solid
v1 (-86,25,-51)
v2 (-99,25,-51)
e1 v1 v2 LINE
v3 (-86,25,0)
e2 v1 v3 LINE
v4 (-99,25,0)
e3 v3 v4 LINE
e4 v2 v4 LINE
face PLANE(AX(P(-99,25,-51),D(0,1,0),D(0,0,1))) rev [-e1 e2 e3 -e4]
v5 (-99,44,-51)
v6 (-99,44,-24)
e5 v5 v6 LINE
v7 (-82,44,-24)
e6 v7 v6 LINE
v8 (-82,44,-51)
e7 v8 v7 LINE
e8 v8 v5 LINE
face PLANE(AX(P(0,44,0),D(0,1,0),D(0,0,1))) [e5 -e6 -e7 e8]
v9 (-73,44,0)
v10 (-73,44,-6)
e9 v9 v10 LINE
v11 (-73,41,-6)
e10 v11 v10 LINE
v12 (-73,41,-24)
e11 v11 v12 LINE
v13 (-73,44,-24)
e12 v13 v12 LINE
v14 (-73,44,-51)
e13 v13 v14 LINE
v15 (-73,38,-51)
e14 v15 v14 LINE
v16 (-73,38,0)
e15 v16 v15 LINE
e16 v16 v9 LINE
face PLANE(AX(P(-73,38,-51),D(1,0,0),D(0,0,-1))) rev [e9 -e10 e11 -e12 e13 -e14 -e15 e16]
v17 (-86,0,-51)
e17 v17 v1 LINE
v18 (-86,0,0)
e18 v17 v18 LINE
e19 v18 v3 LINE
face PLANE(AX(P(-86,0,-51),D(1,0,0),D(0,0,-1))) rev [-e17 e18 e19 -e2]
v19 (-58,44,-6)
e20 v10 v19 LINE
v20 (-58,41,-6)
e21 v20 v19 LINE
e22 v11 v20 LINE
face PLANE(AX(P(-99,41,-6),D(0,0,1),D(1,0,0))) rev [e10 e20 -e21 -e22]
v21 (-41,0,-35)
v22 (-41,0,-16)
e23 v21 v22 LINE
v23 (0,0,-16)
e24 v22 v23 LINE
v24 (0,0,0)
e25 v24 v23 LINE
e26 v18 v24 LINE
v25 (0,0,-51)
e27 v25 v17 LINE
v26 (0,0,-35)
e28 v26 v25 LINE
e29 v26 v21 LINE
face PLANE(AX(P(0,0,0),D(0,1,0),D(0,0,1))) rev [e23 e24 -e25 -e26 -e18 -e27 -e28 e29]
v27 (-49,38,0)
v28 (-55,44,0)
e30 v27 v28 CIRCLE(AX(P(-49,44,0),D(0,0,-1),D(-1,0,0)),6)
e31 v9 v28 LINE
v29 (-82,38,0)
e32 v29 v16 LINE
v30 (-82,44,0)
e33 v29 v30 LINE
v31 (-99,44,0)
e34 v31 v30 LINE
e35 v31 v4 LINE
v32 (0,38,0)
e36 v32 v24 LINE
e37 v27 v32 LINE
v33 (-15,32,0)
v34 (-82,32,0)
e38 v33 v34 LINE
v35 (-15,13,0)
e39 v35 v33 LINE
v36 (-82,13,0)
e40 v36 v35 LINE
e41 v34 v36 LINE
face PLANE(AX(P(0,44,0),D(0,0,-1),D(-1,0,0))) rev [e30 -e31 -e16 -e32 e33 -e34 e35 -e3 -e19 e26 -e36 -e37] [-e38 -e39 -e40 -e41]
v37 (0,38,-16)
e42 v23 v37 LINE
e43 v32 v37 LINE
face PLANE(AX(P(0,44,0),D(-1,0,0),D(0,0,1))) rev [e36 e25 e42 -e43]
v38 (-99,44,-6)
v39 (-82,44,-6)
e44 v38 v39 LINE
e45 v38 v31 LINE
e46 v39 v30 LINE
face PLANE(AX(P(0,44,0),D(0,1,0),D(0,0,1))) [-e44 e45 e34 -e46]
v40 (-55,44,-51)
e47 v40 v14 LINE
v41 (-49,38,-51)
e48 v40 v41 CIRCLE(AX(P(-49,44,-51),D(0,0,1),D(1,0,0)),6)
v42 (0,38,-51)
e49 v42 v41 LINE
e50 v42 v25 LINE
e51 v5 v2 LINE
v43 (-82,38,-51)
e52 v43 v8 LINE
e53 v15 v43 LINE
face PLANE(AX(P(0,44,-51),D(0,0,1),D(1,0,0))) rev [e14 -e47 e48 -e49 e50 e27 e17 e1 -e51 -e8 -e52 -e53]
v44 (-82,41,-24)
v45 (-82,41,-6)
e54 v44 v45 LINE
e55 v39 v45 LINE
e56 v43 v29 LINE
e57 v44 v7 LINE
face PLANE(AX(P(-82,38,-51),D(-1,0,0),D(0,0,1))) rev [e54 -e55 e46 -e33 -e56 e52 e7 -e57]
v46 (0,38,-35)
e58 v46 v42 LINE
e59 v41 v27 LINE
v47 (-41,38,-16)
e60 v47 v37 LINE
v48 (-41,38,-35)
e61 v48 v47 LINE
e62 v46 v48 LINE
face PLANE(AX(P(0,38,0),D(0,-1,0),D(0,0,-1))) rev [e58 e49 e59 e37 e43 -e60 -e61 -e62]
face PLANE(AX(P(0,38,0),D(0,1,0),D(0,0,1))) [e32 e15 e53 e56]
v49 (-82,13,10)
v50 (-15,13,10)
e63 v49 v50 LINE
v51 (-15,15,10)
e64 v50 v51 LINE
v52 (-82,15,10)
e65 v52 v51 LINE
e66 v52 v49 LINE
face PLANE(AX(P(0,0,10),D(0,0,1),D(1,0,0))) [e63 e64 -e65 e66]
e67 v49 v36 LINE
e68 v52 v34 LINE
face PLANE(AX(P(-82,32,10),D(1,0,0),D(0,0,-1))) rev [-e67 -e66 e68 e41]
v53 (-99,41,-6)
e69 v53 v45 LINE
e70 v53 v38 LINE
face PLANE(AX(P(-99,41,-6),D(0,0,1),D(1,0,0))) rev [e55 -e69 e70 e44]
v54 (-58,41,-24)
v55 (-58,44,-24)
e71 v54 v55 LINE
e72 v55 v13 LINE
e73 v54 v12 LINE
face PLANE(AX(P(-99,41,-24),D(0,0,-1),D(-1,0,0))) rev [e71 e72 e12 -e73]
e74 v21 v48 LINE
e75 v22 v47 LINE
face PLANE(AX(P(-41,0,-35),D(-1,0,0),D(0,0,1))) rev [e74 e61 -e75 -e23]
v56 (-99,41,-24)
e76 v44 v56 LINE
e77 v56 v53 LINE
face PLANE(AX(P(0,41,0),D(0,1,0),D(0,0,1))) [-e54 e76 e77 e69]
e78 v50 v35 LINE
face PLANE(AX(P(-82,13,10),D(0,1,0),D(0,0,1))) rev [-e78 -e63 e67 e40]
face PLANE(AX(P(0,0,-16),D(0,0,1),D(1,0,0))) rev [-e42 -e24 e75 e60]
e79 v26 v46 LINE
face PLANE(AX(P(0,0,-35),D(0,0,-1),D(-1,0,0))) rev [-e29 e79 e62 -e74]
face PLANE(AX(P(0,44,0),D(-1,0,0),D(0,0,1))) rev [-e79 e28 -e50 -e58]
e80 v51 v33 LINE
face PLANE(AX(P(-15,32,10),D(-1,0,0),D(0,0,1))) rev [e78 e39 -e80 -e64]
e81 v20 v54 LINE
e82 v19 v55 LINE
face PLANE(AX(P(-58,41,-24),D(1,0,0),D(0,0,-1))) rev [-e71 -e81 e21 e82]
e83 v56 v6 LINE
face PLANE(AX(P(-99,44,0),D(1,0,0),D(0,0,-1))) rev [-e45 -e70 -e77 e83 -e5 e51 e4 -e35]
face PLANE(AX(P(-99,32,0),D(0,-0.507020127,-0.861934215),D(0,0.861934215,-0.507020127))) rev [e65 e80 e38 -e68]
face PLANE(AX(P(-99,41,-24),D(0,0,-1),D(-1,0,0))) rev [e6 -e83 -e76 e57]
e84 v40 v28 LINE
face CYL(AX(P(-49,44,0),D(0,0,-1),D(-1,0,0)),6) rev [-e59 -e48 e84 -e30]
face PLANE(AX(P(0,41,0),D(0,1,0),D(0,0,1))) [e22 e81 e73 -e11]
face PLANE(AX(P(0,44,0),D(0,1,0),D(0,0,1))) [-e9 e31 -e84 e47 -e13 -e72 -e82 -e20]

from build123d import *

# Parameters (mm, degrees)
SCHIZZO1_W                   = 99
SCHIZZO1_H                   = 51
ESTRUSIONE_ESTRUSIONE1_DEPTH = 44
SCHIZZO2_W                   = 55
SCHIZZO2_H                   = 51
TAGLIO_ESTRUSIONE1_DEPTH     = 6
SCHIZZO3_W                   = 41
SCHIZZO3_H                   = 18
TAGLIO_ESTRUSIONE2_DEPTH     = 3
SCHIZZO4_W                   = 9
SCHIZZO4_H                   = 51
TAGLIO_ESTRUSIONE3_DEPTH     = 6
SCHIZZO5_W                   = 41
SCHIZZO5_H                   = 19
TAGLIO_ESTRUSIONE4_DEPTH     = 118.669027361
SCHIZZO6_W                   = 13
SCHIZZO6_H                   = 25
TAGLIO_ESTRUSIONE5_DEPTH     = 120.741387999
SCHIZZO7_W                   = 67
SCHIZZO7_H                   = 19
ESTRUSIONE_ESTRUSIONE2_DEPTH = 10
TAGLIO_ESTRUSIONE6_DEPTH     = 108.670794555
RACCORDO1_R                  = 6


with BuildPart() as part:
    # Schizzo1 → Estrusione-Estrusione1 (new body)
    with BuildSketch(Plane(origin=(0, 0, 0), x_dir=(1, 0, 0), z_dir=(0, 1, 0))):
        with Locations((-49.5, 25.5)):
            Rectangle(SCHIZZO1_W, SCHIZZO1_H)
    extrude(amount=ESTRUSIONE_ESTRUSIONE1_DEPTH)

    # Schizzo2 → Taglio-Estrusione1 (cut)
    with BuildSketch(Plane(origin=(0, 44, 0), x_dir=(1, 0, 0), z_dir=(0, 1, 0))):
        with Locations((-27.5, 25.5)):
            Rectangle(SCHIZZO2_W, SCHIZZO2_H)
    extrude(amount=-TAGLIO_ESTRUSIONE1_DEPTH, mode=Mode.SUBTRACT)

    # Schizzo3 → Taglio-Estrusione2 (cut)
    with BuildSketch(Plane(origin=(0, 44, 0), x_dir=(1, 0, 0), z_dir=(0, 1, 0))):
        with Locations((-78.5, 15)):
            Rectangle(SCHIZZO3_W, SCHIZZO3_H)
    extrude(amount=-TAGLIO_ESTRUSIONE2_DEPTH, mode=Mode.SUBTRACT)

    # Schizzo4 → Taglio-Estrusione3 (cut)
    with BuildSketch(Plane(origin=(0, 44, 0), x_dir=(1, 0, 0), z_dir=(0, 1, 0))):
        with Locations((-77.5, 25.5)):
            Rectangle(SCHIZZO4_W, SCHIZZO4_H)
    extrude(amount=-TAGLIO_ESTRUSIONE3_DEPTH, mode=Mode.SUBTRACT)

    # Schizzo5 → Taglio-Estrusione4 (cut, through all)
    with BuildSketch(Plane(origin=(0, 38, 0), x_dir=(1, 0, 0), z_dir=(0, 1, 0))):
        with Locations((-20.5, 25.5)):
            Rectangle(SCHIZZO5_W, SCHIZZO5_H)
    extrude(amount=-TAGLIO_ESTRUSIONE4_DEPTH, mode=Mode.SUBTRACT)

    # Schizzo6 → Taglio-Estrusione5 (cut, through all)
    with BuildSketch(Plane.XY):
        with Locations((-92.5, 12.5)):
            Rectangle(SCHIZZO6_W, SCHIZZO6_H)
    extrude(amount=-TAGLIO_ESTRUSIONE5_DEPTH, mode=Mode.SUBTRACT)

    # Schizzo7 → Estrusione-Estrusione2 (add)
    with BuildSketch(Plane.XY):
        with Locations((-48.5, 22.5)):
            Rectangle(SCHIZZO7_W, SCHIZZO7_H)
    extrude(amount=ESTRUSIONE_ESTRUSIONE2_DEPTH)

    # Schizzo8 → Taglio-Estrusione6 (cut, through all)
    with BuildSketch(Plane(origin=(-15, 0, 0), x_dir=(0, 0, -1), z_dir=(1, 0, 0))):
        Polygon((0, 32), (-10, 15), (-10, 32), align=None)
    extrude(amount=-TAGLIO_ESTRUSIONE6_DEPTH, mode=Mode.SUBTRACT)

    # Raccordo1
    raccordo1_edges = [part.edges().sort_by_distance(p)[0] for p in [
        (-55, 38, -25.5),
    ]]
    fillet(raccordo1_edges, radius=RACCORDO1_R - 0.0001)  # a hair under: the kernel refuses the full size


solid = part.part
